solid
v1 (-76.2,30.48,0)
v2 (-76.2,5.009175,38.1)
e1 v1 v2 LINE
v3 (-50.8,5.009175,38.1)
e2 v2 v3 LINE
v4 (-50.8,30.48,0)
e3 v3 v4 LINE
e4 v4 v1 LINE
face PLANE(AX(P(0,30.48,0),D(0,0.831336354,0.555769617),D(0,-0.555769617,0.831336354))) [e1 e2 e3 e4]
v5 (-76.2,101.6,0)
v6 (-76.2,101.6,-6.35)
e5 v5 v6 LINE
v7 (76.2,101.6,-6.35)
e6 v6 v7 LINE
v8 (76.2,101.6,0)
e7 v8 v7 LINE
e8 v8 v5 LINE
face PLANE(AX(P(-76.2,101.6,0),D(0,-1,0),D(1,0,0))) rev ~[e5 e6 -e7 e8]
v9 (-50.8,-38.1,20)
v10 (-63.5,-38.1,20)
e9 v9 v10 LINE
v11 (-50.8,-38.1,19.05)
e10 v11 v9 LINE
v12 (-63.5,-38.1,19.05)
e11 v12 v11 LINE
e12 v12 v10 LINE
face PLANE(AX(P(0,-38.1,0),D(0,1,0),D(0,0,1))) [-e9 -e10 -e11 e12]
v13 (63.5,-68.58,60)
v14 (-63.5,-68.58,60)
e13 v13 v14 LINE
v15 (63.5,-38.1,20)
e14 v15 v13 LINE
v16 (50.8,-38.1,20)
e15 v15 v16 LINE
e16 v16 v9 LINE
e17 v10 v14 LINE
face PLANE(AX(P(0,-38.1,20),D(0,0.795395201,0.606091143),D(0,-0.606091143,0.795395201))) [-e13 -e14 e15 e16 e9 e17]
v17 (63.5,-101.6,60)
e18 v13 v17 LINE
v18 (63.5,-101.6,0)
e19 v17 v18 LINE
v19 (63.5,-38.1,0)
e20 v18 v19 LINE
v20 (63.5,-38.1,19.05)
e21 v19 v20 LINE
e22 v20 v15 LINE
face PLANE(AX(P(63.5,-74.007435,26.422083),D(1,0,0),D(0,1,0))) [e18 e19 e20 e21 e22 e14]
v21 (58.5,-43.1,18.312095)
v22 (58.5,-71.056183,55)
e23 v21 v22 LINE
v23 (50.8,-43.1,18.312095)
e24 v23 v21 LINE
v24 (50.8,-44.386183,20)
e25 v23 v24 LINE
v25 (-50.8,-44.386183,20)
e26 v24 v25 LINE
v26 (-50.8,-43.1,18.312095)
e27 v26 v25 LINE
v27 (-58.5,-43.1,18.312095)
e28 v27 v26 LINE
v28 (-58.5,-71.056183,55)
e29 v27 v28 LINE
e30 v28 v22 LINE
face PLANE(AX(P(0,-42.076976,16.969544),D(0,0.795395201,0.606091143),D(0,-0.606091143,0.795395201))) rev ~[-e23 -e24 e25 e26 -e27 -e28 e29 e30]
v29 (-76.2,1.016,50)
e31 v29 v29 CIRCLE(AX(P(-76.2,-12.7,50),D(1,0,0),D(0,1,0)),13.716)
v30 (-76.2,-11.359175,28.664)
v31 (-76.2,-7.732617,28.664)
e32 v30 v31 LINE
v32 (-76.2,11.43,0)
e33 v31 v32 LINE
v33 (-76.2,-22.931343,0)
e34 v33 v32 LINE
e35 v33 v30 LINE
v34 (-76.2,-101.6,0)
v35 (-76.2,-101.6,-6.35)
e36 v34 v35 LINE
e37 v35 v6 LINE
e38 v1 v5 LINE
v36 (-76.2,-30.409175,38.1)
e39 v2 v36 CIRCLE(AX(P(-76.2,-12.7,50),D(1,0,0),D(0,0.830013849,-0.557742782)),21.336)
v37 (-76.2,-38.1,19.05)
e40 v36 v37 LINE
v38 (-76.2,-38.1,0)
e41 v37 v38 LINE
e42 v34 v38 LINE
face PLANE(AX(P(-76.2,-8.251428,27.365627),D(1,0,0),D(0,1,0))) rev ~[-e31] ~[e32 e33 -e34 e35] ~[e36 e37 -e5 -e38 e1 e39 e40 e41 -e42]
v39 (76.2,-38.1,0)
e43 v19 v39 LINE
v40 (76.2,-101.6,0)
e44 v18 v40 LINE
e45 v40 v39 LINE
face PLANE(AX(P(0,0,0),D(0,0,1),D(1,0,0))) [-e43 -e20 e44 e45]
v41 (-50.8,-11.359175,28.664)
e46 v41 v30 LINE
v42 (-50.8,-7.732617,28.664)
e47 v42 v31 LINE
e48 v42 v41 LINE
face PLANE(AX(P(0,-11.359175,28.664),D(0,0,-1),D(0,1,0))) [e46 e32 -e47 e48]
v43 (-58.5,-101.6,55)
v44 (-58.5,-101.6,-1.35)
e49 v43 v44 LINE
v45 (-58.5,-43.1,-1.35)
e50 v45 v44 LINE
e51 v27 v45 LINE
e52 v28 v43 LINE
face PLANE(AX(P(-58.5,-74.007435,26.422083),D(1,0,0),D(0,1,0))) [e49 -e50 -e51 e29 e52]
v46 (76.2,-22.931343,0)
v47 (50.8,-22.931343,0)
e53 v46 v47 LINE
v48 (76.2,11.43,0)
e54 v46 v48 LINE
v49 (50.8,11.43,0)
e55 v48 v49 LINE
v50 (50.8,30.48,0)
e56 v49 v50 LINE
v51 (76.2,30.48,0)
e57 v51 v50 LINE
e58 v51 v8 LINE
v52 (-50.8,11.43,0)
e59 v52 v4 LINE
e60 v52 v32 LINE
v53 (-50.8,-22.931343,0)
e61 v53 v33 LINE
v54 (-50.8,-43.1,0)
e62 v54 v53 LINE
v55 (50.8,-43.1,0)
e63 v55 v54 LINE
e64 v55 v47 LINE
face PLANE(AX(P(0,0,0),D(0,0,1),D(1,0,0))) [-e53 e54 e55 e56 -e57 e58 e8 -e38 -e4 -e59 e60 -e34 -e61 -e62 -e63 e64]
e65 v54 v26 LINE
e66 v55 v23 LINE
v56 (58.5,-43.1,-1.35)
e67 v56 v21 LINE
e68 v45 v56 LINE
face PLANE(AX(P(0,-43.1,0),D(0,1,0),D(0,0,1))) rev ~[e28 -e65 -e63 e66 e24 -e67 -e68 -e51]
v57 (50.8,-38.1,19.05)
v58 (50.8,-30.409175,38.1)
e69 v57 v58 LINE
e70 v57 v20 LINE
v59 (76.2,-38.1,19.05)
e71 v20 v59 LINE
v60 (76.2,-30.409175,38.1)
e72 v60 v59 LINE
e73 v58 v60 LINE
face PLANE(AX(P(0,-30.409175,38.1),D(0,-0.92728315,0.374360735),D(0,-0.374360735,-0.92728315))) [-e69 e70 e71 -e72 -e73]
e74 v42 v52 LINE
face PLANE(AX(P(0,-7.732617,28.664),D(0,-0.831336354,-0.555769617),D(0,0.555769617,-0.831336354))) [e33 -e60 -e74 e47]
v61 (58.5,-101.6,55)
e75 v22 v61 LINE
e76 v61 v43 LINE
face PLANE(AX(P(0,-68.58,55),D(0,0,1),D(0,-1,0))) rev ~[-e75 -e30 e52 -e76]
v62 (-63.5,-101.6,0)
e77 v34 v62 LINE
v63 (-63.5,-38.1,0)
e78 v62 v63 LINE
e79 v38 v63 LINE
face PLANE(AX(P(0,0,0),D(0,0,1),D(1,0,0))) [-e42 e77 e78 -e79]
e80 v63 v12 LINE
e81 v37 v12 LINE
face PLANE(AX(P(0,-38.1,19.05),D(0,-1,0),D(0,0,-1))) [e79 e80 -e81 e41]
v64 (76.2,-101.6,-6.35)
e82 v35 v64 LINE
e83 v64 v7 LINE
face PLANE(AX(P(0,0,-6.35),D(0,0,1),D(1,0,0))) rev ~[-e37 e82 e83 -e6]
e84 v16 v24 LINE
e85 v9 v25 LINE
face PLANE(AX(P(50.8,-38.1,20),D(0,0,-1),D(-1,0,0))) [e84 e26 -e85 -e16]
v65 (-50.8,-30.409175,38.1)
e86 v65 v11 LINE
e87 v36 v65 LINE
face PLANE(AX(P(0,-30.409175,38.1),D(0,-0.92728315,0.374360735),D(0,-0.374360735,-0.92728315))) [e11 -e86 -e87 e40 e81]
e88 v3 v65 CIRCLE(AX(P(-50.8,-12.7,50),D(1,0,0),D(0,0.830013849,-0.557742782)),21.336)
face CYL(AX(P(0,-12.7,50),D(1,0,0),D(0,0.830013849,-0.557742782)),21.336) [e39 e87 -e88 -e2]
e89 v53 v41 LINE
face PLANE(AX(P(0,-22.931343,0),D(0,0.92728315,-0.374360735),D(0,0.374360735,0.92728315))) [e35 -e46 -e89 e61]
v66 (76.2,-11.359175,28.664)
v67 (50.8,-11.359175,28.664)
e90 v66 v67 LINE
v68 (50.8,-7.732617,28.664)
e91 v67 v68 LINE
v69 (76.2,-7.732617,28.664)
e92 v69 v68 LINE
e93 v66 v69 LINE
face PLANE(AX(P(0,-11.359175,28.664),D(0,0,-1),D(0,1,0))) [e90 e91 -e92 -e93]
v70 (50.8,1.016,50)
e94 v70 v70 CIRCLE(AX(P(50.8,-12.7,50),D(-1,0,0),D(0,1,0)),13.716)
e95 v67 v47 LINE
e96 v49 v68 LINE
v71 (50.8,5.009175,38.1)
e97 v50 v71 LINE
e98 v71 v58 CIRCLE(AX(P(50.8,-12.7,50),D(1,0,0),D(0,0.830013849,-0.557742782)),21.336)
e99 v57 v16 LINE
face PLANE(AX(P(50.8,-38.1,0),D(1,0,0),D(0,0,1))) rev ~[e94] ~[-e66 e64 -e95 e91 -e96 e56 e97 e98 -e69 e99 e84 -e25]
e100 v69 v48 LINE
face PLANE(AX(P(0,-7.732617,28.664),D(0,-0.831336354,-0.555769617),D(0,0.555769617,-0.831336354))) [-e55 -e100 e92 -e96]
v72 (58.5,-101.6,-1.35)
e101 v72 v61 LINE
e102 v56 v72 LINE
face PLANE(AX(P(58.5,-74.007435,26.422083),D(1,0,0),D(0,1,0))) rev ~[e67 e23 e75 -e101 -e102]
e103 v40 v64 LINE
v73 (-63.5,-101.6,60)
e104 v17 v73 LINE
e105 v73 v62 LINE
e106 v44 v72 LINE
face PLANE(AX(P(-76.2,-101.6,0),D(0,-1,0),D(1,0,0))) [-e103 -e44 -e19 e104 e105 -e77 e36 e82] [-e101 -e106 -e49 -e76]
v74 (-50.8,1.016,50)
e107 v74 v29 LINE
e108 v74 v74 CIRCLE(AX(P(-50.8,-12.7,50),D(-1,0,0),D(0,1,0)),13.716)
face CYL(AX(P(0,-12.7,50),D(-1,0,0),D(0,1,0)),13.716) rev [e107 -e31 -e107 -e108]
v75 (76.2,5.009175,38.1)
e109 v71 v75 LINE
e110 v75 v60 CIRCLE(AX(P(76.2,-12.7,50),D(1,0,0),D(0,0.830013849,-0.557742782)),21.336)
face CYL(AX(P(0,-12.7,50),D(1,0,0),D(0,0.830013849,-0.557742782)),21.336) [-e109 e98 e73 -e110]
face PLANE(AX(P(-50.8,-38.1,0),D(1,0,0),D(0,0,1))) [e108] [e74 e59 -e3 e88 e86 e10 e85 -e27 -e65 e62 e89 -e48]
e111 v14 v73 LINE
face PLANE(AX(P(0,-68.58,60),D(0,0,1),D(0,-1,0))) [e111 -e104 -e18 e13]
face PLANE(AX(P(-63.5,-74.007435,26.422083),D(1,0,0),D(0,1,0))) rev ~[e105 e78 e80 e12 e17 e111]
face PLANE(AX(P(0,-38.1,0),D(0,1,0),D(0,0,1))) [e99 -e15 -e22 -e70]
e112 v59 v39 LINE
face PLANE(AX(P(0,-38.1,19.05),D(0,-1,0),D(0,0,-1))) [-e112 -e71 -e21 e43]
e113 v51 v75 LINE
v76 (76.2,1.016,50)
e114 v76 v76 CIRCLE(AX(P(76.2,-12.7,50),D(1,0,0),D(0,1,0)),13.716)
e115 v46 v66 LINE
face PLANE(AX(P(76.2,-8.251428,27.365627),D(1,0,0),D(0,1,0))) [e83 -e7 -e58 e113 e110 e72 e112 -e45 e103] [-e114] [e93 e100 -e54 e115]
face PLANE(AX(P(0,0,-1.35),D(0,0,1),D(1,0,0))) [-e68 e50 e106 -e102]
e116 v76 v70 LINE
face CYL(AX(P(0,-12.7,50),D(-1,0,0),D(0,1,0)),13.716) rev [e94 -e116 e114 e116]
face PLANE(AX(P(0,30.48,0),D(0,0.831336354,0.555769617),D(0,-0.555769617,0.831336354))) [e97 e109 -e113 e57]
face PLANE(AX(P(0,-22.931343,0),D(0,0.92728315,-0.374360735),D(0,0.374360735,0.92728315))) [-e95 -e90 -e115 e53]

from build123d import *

# Parameters (mm, degrees)
F0_W          = 152.4
F0_H          = 203.2
F1_DEPTH      = 6.35
F3_DEPTH      = 63.5
F4_T          = 5
F4_T3_DEPTH   = 73.5
F4_T5_DEPTH   = 137
F6_R          = 13.716
F7_DEPTH      = 76.2
F5_W          = 101.6
F5_H          = 20
F8_DEPTH      = 63.501
F8_DEPTH_BACK = 139.701
F10_DEPTH     = 71.337


# Not quite as in the source:
# - a shell that OpenCascade refuses in one call is made with other operations: the cavity is built on its own and cut out


with BuildPart() as f1:
    # F0 (on Top) → F1 (new body)
    with BuildSketch(Plane.XY):
        Rectangle(F0_W, F0_H)
    extrude(amount=-F1_DEPTH)

    # F2 (on Right) → F3 (join, symmetric)
    with BuildSketch(Plane.YZ):
        Polygon((-101.6, 60), (-101.6, 0), (-38.1, 0), (-38.1, 20), (-68.58, 60), align=None)
    extrude(amount=F3_DEPTH, both=True)

    # F4: shell of thickness 5, made by hand


with BuildPart() as f4_core1:
    # F4_t2: copy of F1
    add(f1.part)

    # the walls: a layer under each face that stays
    f4_faces = [f4_core1.faces().sort_by_distance(p)[0] for p in [
        (0, 101.6, -3.175),
        (76.2, 0, -3.175),
        (-76.2, 0, -3.175),
        (0, 0, 0),
        (0, 0, -6.35),
        (63.5, -69.85, 30),
        (0, -38.1, 10),
        (-63.5, -69.85, 30),
        (0, -53.34, 40),
        (0, -85.09, 60),
    ]]
    thicken(f4_faces, amount=-F4_T, mode=Mode.SUBTRACT)

    # F4_s4 → F4_t3 (cut)
    with BuildSketch(Plane.XZ.offset(33.1)):
        Polygon((63.55, 0.05), (63.5, -5), (58.5, -5), (58.5, 0), align=None)
        Polygon((-63.55, 0.05), (-63.5, -5), (-58.5, -5), (-58.5, 0), align=None)
    extrude(amount=F4_T3_DEPTH, mode=Mode.SUBTRACT)

    # F4_s6 → F4_t5 (cut)
    with BuildSketch(Plane.YZ.offset(-68.5)):
        Polygon((-38.05, 0.05), (-38.1, -5), (-43.1, -5), (-43.1, 0), align=None)
    extrude(amount=F4_T5_DEPTH, mode=Mode.SUBTRACT)


with BuildPart() as f1_1:
    add(f1.part)

    # what is left inside the walls is the cavity
    f4_cavity = [f4_core1.part.solids().sort_by_distance(p)[0] for p in [
        (0, -82.1, -1.3),
    ]]
    add(f4_cavity, mode=Mode.SUBTRACT)

    # F6 (on Right) → F7 (join, symmetric)
    with BuildSketch(Plane.YZ):
        with BuildLine():
            Line((30.48, 0), (5.0091754749, 38.1))
            ThreePointArc((5.0091754749, 38.1), (-12.7, 71.336), (-30.4091754749, 38.1))
            Line((-30.4091754749, 38.1), (-38.1, 19.05))
            Line((-38.1, 19.05), (-38.1, 0))
            Line((-38.1, 0), (-22.9313431488, 0))
            Line((-22.9313431488, 0), (-11.3591754749, 28.664))
            Line((-11.3591754749, 28.664), (-7.7326171703, 28.664))
            Line((-7.7326171703, 28.664), (11.43, 0))
            Line((11.43, 0), (30.48, 0))
        make_face()
        with Locations((-12.7, 50)):
            Circle(F6_R, mode=Mode.SUBTRACT)
    extrude(amount=F7_DEPTH, both=True)

    # F5 (on face) → F8 (cut, two sides)
    with BuildSketch(Plane(origin=(0, -38.1, 0), x_dir=(-1, 0, 0), z_dir=(0, 1, 0))) as f8_sk:
        with Locations((0, 10)):
            Rectangle(F5_W, F5_H)
    extrude(amount=-F8_DEPTH, mode=Mode.SUBTRACT)
    extrude(f8_sk.sketch, amount=F8_DEPTH_BACK, mode=Mode.SUBTRACT)

    # F9 (on face) → F10 (cut, through all)
    with BuildSketch(Plane.XY):
        Polygon((50.8, 11.43), (50.8, 30.48), (-50.8, 30.48), (-50.8, 11.43), (-50.8, -22.9313431488), (-50.8, -38.1), (50.8, -38.1), (50.8, -22.9313431488), align=None)
    extrude(amount=F10_DEPTH, mode=Mode.SUBTRACT)


solid = f1_1.part
